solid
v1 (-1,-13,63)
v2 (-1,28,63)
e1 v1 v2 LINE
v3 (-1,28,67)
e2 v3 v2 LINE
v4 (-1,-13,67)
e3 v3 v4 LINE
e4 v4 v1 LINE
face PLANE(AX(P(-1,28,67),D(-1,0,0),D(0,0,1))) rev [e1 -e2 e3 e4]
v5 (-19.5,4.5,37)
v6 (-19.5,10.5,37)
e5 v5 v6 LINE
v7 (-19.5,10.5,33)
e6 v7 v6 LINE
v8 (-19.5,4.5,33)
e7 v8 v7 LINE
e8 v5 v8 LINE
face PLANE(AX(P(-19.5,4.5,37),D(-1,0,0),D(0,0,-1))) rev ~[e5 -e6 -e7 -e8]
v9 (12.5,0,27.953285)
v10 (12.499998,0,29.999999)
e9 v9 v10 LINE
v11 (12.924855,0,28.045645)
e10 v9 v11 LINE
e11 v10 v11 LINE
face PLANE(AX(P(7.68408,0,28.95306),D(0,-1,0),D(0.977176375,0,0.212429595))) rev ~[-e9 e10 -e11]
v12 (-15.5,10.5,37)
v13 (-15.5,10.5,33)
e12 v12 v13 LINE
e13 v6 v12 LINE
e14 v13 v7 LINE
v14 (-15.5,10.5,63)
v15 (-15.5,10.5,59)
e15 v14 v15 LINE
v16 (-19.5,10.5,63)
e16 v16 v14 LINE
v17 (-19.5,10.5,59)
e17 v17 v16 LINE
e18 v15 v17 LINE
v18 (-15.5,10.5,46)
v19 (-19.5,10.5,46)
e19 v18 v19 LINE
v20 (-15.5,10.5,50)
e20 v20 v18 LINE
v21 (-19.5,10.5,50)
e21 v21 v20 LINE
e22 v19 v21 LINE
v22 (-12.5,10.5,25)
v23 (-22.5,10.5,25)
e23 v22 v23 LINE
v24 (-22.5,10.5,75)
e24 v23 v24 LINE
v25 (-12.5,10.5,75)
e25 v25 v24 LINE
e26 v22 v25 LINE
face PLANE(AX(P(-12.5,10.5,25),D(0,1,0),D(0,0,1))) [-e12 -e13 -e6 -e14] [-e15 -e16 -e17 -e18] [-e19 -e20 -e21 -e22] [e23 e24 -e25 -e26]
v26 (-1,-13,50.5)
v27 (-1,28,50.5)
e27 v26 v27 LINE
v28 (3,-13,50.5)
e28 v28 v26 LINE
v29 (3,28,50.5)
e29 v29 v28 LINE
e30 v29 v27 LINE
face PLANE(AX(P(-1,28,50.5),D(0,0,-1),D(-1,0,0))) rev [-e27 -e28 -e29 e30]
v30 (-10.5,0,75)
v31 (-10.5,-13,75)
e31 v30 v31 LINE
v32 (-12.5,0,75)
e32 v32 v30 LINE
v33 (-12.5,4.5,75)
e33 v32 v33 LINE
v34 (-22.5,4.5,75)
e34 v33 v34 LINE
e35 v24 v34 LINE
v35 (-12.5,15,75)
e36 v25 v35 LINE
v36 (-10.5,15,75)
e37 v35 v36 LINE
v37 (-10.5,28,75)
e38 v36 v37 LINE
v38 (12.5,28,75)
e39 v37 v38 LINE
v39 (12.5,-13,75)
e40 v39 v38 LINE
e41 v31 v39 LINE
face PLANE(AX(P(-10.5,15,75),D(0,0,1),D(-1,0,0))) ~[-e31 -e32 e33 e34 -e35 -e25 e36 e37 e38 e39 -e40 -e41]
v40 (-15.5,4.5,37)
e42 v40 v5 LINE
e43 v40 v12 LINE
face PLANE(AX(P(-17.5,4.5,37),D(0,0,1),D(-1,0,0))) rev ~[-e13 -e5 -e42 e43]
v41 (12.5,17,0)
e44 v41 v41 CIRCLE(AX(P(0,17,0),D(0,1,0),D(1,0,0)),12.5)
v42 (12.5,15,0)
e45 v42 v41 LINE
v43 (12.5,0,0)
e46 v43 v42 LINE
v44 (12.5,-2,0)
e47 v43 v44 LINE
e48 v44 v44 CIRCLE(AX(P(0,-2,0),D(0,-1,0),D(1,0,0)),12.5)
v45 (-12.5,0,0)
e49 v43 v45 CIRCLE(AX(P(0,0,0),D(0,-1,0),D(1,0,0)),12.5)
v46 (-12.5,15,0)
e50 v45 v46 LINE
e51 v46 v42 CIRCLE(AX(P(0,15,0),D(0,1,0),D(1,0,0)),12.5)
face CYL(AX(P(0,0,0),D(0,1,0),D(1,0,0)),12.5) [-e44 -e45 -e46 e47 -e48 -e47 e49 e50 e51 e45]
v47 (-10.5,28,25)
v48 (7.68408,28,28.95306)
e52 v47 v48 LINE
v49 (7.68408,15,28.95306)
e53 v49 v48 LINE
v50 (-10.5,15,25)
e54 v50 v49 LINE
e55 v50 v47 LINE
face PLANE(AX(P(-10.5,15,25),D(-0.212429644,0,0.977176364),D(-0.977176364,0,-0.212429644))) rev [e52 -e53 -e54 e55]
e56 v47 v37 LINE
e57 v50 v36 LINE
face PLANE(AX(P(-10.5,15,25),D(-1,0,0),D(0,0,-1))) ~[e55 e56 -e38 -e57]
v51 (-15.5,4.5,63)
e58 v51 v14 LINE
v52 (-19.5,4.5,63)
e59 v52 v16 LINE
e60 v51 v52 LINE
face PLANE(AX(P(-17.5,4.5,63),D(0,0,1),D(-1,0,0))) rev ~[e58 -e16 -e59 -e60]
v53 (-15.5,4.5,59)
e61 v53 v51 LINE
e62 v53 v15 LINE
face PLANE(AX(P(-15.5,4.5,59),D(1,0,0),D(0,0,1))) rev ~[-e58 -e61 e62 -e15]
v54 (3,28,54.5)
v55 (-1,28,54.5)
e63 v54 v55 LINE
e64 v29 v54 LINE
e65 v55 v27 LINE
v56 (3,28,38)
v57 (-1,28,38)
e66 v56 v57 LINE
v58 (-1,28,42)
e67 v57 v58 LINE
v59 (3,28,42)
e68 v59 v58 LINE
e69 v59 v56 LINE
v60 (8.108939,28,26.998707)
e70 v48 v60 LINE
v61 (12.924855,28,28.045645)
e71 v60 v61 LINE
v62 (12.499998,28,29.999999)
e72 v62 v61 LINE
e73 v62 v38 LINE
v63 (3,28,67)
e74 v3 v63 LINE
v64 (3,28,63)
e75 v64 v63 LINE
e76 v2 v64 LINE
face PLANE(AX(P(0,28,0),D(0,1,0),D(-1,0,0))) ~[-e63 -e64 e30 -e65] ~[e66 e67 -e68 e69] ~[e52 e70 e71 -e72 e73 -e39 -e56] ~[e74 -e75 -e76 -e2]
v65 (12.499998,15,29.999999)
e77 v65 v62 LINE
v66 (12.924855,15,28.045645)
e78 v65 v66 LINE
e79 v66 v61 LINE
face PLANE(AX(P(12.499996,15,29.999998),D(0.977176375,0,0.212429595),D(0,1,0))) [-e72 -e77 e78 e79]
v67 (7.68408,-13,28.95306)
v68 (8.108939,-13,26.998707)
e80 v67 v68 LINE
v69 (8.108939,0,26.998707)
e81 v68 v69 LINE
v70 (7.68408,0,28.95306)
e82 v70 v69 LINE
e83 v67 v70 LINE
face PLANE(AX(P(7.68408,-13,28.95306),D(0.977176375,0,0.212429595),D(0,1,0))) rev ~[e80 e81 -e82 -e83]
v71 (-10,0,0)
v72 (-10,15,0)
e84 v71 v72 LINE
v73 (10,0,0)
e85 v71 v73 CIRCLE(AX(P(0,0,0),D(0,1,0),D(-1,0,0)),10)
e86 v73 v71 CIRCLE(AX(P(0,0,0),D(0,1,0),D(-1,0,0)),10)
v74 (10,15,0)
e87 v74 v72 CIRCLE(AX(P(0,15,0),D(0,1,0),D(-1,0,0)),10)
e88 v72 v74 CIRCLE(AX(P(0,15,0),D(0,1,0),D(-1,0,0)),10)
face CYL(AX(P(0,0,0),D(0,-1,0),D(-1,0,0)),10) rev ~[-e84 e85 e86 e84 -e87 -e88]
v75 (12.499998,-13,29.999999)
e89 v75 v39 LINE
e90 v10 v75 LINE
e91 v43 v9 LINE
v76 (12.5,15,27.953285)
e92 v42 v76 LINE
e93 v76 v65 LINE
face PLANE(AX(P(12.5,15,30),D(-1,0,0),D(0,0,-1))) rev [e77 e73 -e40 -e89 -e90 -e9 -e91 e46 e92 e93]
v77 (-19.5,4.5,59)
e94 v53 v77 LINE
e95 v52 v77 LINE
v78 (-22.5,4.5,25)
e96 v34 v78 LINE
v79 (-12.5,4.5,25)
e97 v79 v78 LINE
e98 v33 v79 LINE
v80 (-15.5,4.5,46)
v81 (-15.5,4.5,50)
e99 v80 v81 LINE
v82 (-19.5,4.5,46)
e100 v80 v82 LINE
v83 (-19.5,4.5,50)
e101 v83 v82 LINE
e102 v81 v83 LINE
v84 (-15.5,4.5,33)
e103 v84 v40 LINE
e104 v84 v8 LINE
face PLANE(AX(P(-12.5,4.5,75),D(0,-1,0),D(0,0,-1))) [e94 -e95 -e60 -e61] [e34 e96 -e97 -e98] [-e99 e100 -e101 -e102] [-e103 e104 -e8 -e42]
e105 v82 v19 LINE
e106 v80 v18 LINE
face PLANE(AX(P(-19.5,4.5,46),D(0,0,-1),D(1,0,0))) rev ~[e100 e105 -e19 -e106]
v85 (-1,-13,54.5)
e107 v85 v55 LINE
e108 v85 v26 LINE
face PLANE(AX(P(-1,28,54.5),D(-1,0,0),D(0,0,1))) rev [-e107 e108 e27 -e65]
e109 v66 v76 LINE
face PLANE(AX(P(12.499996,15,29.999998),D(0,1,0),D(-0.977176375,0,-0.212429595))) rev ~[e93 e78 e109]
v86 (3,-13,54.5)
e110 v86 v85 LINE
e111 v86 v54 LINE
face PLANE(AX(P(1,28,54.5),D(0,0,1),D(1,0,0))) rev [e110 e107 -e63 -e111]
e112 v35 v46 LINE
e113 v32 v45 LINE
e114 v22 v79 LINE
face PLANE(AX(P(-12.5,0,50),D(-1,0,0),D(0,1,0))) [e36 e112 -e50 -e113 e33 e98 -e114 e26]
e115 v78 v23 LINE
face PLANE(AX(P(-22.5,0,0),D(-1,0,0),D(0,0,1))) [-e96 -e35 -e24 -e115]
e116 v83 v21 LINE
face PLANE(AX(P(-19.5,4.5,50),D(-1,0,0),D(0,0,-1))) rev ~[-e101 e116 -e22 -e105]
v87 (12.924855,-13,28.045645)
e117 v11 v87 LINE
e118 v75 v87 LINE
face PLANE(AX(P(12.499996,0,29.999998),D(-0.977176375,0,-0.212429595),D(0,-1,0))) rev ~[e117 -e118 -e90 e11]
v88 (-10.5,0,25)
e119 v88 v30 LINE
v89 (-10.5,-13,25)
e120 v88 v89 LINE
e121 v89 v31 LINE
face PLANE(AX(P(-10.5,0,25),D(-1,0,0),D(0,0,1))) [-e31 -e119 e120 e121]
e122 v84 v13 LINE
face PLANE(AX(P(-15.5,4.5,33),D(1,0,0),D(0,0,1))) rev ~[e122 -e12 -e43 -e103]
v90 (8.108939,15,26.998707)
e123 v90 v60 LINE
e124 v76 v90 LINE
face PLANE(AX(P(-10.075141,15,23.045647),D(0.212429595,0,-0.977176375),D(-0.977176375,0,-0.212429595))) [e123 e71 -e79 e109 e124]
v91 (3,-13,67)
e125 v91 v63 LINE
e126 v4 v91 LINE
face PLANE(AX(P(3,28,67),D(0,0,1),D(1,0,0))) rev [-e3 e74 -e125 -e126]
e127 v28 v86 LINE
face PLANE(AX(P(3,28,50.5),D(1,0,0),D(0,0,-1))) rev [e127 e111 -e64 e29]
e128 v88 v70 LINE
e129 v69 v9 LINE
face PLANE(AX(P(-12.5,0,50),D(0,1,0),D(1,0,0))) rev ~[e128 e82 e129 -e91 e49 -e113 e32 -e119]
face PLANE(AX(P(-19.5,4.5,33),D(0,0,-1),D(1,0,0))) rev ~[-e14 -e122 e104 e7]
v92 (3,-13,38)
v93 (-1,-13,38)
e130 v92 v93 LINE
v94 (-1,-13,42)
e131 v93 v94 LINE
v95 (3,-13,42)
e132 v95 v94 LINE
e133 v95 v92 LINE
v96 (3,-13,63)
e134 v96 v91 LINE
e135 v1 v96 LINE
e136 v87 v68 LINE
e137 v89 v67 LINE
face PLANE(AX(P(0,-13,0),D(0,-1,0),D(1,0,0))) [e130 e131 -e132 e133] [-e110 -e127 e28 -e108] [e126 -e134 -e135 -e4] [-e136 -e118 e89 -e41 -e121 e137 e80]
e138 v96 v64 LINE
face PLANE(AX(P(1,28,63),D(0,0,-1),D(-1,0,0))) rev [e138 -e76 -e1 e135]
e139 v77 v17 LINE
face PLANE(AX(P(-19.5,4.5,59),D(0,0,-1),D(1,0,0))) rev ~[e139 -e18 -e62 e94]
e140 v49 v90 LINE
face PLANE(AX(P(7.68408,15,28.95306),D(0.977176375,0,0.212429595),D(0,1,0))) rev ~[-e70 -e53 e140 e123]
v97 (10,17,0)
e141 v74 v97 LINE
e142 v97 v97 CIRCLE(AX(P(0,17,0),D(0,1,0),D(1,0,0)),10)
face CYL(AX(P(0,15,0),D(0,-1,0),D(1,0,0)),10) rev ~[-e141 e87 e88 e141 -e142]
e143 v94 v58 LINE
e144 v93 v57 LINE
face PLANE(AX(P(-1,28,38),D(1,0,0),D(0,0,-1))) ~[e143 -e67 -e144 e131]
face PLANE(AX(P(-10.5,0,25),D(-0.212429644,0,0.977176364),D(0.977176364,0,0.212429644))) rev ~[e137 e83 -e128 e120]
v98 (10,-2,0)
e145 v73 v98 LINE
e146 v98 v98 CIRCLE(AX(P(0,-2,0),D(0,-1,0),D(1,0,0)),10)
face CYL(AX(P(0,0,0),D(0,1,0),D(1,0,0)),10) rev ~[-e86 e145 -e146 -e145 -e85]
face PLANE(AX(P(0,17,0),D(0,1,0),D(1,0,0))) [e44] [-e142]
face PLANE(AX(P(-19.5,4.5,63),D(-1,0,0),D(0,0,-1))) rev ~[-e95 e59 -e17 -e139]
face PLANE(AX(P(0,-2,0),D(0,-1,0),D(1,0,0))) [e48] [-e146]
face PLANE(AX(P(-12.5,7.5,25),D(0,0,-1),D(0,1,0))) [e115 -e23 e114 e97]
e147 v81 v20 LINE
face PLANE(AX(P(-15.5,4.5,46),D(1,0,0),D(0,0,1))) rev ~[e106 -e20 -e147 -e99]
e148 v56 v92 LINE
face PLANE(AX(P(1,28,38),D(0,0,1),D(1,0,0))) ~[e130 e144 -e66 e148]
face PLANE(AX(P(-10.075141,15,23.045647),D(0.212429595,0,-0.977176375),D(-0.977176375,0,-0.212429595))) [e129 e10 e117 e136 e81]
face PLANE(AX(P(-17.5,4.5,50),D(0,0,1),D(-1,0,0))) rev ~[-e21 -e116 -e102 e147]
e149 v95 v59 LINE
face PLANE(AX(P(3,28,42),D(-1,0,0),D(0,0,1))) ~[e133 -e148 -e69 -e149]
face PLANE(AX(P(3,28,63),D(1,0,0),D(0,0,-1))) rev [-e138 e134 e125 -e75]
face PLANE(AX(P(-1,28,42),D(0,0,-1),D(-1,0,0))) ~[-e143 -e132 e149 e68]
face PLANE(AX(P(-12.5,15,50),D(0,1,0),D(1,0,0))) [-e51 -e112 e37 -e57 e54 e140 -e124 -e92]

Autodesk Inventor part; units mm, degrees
ref_plane "YZ Plane" through (0, 0, 0) normal (1, 0, 0) x (0, 1, 0)
ref_plane "XY Plane" through (0, 0, 0) normal (0, 0, 1) x (1, 0, 0)
sketch "Sketch1" plane through (0, 0, 0) normal (0, 1, 0) x (-1, 0, 0)
  circle A0 centre (0, 0) radius 10
  circle A1 centre (0, 0) radius 12.5
  line L0 (12.5, 0) -> (12.5, 50)
  line L1 (-12.5, 0) -> (-12.5, 50)
  line L2 (-12.5, 50) -> (12.5, 50)
  dimension "d0" = 20
  dimension "d1" = 25
  dimension "d2" = 50
extrude "Extrusion1" add sketch "Sketch1" along normal blind 15
sketch "Sketch2" plane through (-12.5, 0, 0) normal (-1, 0, 0) x (0, 0, 1)
  line L0 (-12.5, 0) -> (-12.5, 15) projected
  line L1 (-12.5, 7.5) -> (37.5, 7.5)
  line L2 (25, 7.5) -> (25, 4.5)
  line L3 (25, 4.5) -> (25, 10.5)
  line L4 (25, 10.5) -> (75, 10.5)
  line L5 (75, 10.5) -> (75, 4.5)
  line L6 (75, 4.5) -> (25, 4.5)
  point P0 (0, 0)
  dimension "d5" = 50
  dimension "d8" = 3
  dimension "d9" = 6
  dimension "d10" = 50
extrude "Extrusion2" add sketch "Sketch2" along normal blind 10
sketch "Sketch3" plane through (-12.5, 0, 50) normal (0, 0, 1) x (1, 0, 0)
  point P0 (12.5, 0)
sketch "Sketch4" plane through (-12.5, 0, 50) normal (0, 0, 1) x (1, 0, 0)
  line L0 (25, 0) -> (25, 15) projected
  line L1 (25, 0) -> (25, 15)
  line L2 (0, 15) -> (25, 15) projected
  line L3 (25, 15) -> (0, 15)
  line L4 (0, 0) -> (0, 15) projected
  line L5 (0, 15) -> (0, 0)
  line L6 (0, 0) -> (25, 0) projected
  line L7 (0, 0) -> (25, 0)
  point P0 (12.5, 0)
extrude "Extrusion3" add sketch "Sketch4" along normal blind 25
sketch "Sketch5" plane through (-12.5, 4.5, 25) normal (0, -1, 0) x (1, 0, 0)
  point P0 (12.5, -25)
sketch "Sketch8" plane through (-12.5, 4.5, 25) normal (0, -1, 0) x (1, 0, 0)
  line L0 (0, 0) -> (-10, 0) projected
  line L1 (-5, 0) -> (-5, 50)
  line L2 (0, 50) -> (-10, 50) projected
  line L3 (-3, 12) -> (-7, 12)
  line L4 (-7, 12) -> (-7, 8)
  line L5 (-7, 8) -> (-3, 8)
  line L6 (-3, 8) -> (-3, 12)
  line L7 (-3, 12) -> (-7, 8) construction
  line L8 (-7, 12) -> (-3, 8) construction
  line L9 (-5, 10) -> (-5, 23)
  line L10 (-7, 21) -> (-3, 21)
  line L11 (-3, 21) -> (-3, 25)
  line L12 (-3, 25) -> (-7, 25)
  line L13 (-7, 25) -> (-7, 21)
  line L14 (-7, 21) -> (-3, 25) construction
  line L15 (-3, 21) -> (-7, 25) construction
  line L16 (-5, 23) -> (-5, 36)
  line L17 (-7, 34) -> (-3, 34)
  line L18 (-3, 34) -> (-3, 38)
  line L19 (-3, 38) -> (-7, 38)
  line L20 (-7, 38) -> (-7, 34)
  line L21 (-7, 34) -> (-3, 38) construction
  line L22 (-3, 34) -> (-7, 38) construction
  point P0 (12.5, -25)
  dimension "d40" = 4
  dimension "d41" = 4
  dimension "d42" = 13
  dimension "d43" = 4
  dimension "d44" = 4
  dimension "d45" = 13
  dimension "d46" = 4
  dimension "d47" = 4
extrude "Extrusion6" cut sketch "Sketch8" against normal blind 10
sketch "Sketch9" plane through (0, 0, 0) normal (0, -1, 0) x (1, 0, 0)
  line L0 (-12.5, 25) -> (-22.5, 25) projected
  line L1 (-12.5, 25) -> (12.5, 25)
  line L2 (12.5, 0) -> (12.5, 75) projected
  line L3 (-12.5, 25) -> (-12.5, 75) projected
  line L4 (-12.5, 25) -> (-12.5, 75)
  line L5 (-12.5, 75) -> (12.5, 75) projected
  line L6 (-12.5, 75) -> (12.5, 75)
  line L7 (12.5, 75) -> (12.5, 25)
  line L8 (12.5, 0) -> (12.5, 30)
  line L9 (-12.5, 25) -> (-10.5, 25)
  line L10 (-10.5, 25) -> (-10.5, 75)
  line L11 (-12.5, 75) -> (-12.5, 25)
  line L12 (-10.5, 25) -> (12.5, 30)
  point P0 (0, 0)
  dimension "d50" = 30
  dimension "d51" = 2
extrude "Extrusion7" add sketch "Sketch9" along normal blind 13 contours L10 L5 L2 L12
sketch "Sketch10" plane through (0, -13, 0) normal (0, -1, 0) x (1, 0, 0)
  point P0 (0, 0)
sketch "Sketch11" plane through (0, -13, 0) normal (0, -1, 0) x (1, 0, 0)
  line L0 (-10.5, 25) -> (12.5, 30) projected
  line L1 (12.5, 30) -> (-10.5, 30)
  line L2 (-10.5, 25) -> (-10.5, 75) projected
  line L3 (-10.5, 30) -> (1, 30)
  line L4 (1, 30) -> (1, 75)
  line L5 (12.5, 75) -> (-12.5, 75) projected
  line L6 (-1, 42) -> (3, 42)
  line L7 (3, 42) -> (3, 38)
  line L8 (3, 38) -> (-1, 38)
  line L9 (-1, 38) -> (-1, 42)
  line L10 (-1, 42) -> (3, 38) construction
  line L11 (3, 42) -> (-1, 38) construction
  line L12 (1, 40) -> (1, 52.5)
  line L13 (-1, 50.5) -> (3, 50.5)
  line L14 (3, 50.5) -> (3, 54.5)
  line L15 (3, 54.5) -> (-1, 54.5)
  line L16 (-1, 54.5) -> (-1, 50.5)
  line L17 (-1, 50.5) -> (3, 54.5) construction
  line L18 (3, 50.5) -> (-1, 54.5) construction
  line L19 (1, 52.5) -> (1, 65)
  line L20 (-1, 63) -> (3, 63)
  line L21 (3, 63) -> (3, 67)
  line L22 (3, 67) -> (-1, 67)
  line L23 (-1, 67) -> (-1, 63)
  line L24 (-1, 63) -> (3, 67) construction
  line L25 (3, 63) -> (-1, 67) construction
  line L26 (-1, 38) -> (-1, 42)
  line L27 (-1, 38) -> (3, 38)
  line L28 (3, 38) -> (3, 42)
  line L29 (3, 42) -> (-1, 42)
  line L30 (-1, 42) -> (-1, 38)
  line L31 (-1, 38) -> (3, 42) construction
  line L32 (3, 38) -> (-1, 42) construction
  point P0 (0, 0)
  dimension "d54" = 11.5
  dimension "d55" = 4
  dimension "d56" = 4
  dimension "d57" = 12.5
  dimension "d58" = 4
  dimension "d59" = 4
  dimension "d60" = 12.5
  dimension "d61" = 4
  dimension "d62" = 4
extrude "Extrusion8" cut sketch "Sketch11" against normal blind 50 contours L8 L9 L6 L4 | L4 L6 L7 L8 | L22 L21 L20 L4 | L4 L20 L23 L22 | L13 L16 L15 L4 | L4 L15 L14 L13
ref_plane "Work Plane1" through (0, 7.5, 0) normal (0, 1, 0) x (-1, 0, 0)
mirror "Mirror1" about plane through (0, 7.5, 0) normal (0, 1, 0) of "Extrusion7"
mirror "Mirror2" about plane through (0, 7.5, 0) normal (0, 1, 0) of "Extrusion8"
sketch "Sketch12" plane through (-22.5, 0, 0) normal (-1, 0, 0) x (0, 0, 1)
  point P0 (0, 0)
sketch "Sketch13" plane through (-12.5, 4.5, 25) normal (0, -1, 0) x (1, 0, 0)
  point P0 (12.5, -25)
sketch "Sketch14" plane through (-12.5, 4.5, 25) normal (0, -1, 0) x (1, 0, 0)
  point P0 (12.5, -25)
sketch "Sketch15" plane through (-10.5, 15, 25) normal (0.2124296, 0, -0.9771764) x (-0.9771764, 0, -0.2124296)
  line L0 (-23.5372, 0) -> (-23.5372, 13) projected
  line L1 (-14.7001, 13) -> (-18.6088, 13) projected
  line L2 (-23.5372, 0) -> (-18.5372, 0)
  line L3 (-18.5372, 0) -> (-18.5372, 13)
  line L4 (-18.5372, 13) -> (-23.5372, 13)
  line L5 (-23.5372, 13) -> (-23.5372, 0)
  line L6 (-23.5372, -28) -> (-33.0965, -28) projected
  line L7 (-18.6088, -28) -> (-18.6088, 13) projected
  line L8 (-23.5372, -28) -> (-18.6088, -28)
  line L9 (-18.6088, -28) -> (-18.6088, -15)
  line L10 (-18.6088, -15) -> (-23.5372, -15)
  line L11 (-23.5372, -15) -> (-23.5372, -28)
  point P0 (-4.9496, -15)
  point P1 (-18.6088, 0)
  dimension "d66" = 5
extrude "Extrusion9" add sketch "Sketch15" along normal blind 2 contours L0 L4 L7 L2 | L8 L11 L10 L7
sketch "Sketch16" plane through (0, 15, 0) normal (0, 1, 0) x (1, 0, 0)
  circle A0 centre (0, 0) radius 10
  circle A1 centre (0, 0) radius 12.5
  dimension "d69" = 25
extrude "Extrusion10" add sketch "Sketch16" along normal blind 2
sketch "Sketch17" plane through (0, 0, 0) normal (0, -1, 0) x (1, 0, 0)
  circle A0 centre (0, 0) radius 10
  circle A1 centre (0, 0) radius 10 projected
  circle A2 centre (0, 0) radius 12.5
extrude "Extrusion11" add sketch "Sketch17" along normal blind 2
properties part number "Part10copycopy"
